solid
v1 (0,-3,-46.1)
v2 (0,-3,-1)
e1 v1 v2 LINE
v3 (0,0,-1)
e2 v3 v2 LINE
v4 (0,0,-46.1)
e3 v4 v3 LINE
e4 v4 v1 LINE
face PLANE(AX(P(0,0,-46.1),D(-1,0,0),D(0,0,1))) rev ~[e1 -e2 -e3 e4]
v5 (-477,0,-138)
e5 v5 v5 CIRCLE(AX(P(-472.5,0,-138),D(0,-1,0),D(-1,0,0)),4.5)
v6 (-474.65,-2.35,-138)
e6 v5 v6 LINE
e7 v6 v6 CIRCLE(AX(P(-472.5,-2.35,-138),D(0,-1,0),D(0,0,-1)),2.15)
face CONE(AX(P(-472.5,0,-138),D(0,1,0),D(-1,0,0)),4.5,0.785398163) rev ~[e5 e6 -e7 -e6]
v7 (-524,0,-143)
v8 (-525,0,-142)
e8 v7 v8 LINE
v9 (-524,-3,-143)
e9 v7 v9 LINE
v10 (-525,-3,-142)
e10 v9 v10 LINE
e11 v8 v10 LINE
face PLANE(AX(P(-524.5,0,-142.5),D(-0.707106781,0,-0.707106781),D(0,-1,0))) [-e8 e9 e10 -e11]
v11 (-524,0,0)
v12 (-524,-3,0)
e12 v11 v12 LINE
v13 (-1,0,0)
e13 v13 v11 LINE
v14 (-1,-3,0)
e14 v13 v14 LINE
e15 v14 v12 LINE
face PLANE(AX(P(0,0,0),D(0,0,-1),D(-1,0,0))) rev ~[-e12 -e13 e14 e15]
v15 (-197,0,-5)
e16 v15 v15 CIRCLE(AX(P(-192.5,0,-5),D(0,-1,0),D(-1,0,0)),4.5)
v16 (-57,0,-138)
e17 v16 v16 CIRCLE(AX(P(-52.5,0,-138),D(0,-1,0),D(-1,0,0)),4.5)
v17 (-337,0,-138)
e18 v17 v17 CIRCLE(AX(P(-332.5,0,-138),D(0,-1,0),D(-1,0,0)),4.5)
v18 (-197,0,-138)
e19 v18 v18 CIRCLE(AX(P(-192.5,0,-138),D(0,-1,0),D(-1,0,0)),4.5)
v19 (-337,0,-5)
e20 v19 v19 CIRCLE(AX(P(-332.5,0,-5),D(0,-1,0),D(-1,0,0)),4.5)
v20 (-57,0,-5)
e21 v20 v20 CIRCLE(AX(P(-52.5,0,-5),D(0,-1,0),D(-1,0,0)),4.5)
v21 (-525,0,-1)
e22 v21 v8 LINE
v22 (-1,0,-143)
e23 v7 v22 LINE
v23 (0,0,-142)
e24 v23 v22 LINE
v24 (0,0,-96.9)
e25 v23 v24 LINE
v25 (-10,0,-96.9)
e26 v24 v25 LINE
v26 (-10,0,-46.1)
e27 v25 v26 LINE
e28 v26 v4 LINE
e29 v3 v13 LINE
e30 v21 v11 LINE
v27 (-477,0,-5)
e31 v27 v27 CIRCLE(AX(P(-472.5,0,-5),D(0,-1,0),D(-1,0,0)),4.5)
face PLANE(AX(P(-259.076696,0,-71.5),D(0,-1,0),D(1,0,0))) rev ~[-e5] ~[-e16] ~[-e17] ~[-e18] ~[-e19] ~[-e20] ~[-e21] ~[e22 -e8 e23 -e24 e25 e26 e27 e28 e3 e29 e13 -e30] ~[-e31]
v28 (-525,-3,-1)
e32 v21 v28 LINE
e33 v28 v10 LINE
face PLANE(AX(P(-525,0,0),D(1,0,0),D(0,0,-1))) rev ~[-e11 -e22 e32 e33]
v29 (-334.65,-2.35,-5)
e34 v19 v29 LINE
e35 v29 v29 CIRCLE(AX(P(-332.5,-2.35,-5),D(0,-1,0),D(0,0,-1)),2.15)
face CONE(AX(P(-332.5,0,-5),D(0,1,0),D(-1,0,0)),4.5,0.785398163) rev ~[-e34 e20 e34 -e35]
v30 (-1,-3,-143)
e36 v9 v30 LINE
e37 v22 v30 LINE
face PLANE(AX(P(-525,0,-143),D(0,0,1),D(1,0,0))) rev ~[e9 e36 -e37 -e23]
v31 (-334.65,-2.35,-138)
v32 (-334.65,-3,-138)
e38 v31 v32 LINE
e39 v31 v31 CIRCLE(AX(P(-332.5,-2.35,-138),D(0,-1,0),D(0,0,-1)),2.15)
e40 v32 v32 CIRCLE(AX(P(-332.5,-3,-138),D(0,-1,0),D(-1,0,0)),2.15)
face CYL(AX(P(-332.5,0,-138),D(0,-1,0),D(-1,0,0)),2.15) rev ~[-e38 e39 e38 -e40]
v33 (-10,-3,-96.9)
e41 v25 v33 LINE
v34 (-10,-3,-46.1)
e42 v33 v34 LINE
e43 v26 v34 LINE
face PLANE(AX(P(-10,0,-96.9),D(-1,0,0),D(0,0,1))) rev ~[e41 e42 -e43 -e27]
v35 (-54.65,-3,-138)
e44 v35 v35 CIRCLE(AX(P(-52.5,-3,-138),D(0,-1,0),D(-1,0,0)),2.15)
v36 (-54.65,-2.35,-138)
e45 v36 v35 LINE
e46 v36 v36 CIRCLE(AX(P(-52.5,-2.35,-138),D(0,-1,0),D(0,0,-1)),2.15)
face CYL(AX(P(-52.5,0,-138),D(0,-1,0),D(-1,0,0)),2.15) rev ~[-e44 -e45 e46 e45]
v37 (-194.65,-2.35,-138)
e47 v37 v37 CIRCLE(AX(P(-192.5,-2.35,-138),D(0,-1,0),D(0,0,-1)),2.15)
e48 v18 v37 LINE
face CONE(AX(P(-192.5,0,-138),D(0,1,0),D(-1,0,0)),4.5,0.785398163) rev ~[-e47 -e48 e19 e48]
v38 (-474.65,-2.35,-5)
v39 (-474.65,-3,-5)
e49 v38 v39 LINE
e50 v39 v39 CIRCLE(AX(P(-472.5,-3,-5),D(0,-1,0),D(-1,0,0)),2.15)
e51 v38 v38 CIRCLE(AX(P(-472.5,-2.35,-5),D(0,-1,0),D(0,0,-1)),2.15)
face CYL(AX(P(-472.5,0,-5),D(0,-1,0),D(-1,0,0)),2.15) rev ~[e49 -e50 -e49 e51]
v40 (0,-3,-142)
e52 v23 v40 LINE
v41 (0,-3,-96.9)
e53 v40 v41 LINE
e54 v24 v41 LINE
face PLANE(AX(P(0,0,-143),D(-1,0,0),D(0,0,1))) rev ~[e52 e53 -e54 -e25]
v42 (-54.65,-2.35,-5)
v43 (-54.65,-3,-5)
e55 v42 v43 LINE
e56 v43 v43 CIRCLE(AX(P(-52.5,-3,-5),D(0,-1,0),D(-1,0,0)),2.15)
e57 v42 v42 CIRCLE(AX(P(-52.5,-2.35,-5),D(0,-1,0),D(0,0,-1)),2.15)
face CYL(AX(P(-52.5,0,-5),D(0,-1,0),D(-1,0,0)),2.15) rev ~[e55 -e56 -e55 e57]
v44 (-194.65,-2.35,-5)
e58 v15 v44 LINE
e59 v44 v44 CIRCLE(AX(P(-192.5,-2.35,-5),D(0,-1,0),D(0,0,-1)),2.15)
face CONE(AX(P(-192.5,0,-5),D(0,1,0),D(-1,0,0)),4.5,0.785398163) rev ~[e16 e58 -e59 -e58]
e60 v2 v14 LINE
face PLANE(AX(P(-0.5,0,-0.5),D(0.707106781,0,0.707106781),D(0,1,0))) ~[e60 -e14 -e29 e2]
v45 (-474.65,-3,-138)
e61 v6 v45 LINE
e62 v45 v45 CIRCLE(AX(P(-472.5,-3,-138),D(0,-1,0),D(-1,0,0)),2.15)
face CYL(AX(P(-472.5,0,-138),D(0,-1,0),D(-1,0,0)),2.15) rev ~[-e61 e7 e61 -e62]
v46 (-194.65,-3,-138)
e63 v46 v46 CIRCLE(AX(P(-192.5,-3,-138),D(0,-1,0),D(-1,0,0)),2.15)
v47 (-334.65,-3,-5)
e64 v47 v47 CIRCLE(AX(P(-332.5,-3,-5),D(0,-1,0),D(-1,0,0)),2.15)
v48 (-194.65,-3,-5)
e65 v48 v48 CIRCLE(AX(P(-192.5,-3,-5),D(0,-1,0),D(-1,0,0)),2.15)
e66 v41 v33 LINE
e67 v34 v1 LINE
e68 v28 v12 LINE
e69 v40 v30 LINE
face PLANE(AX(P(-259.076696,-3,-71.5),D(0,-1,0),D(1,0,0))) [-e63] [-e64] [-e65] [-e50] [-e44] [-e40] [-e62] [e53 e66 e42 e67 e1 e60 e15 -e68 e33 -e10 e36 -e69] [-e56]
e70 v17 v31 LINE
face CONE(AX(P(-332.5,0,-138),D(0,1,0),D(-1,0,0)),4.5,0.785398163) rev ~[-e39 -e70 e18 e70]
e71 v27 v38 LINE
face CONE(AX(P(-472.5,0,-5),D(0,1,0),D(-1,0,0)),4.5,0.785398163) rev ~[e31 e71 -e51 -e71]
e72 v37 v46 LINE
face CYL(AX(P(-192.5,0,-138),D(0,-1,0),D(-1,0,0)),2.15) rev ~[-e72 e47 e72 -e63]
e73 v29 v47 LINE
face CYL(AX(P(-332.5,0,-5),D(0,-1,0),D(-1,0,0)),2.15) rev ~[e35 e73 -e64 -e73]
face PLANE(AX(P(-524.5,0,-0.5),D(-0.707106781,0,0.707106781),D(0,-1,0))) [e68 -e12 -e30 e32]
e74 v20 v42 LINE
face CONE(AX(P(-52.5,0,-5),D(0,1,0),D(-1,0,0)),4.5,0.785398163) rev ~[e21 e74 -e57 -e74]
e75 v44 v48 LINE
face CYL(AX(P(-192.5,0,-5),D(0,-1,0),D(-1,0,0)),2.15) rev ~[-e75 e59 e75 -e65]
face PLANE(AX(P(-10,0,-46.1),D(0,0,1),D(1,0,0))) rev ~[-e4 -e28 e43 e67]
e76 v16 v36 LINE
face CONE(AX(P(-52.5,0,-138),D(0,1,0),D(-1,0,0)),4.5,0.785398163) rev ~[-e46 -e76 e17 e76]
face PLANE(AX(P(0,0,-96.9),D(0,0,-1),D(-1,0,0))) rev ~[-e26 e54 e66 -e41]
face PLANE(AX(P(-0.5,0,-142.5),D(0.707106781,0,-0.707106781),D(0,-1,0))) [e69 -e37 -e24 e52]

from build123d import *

# Parameters (mm, degrees)
F1_DEPTH       = 3
F3_D           = 4.3
F3_CSINK_D     = 9
F3_CSINK_ANGLE = 90
F4_SIZE        = 1


# Not quite as in the source:
# - a feature names something its author has since deleted; it is built from what else it names


with BuildPart() as f1:
    # F0 (on Front) → F1 (new body)
    with BuildSketch(Plane.XZ):
        Polygon((0, -46.1), (0, 0), (-525, 0), (-525, -143), (0, -143), (0, -96.9), (-10, -96.9), (-10, -46.1), align=None)
    extrude(amount=F1_DEPTH)

    # F3 (through all)
    with Locations(Plane(origin=(0, 0, 0), x_dir=(1, 0, 0), z_dir=(0, 1, 0))):
        with Locations((-472.5, 5), (-332.5, 5), (-192.5, 5), (-52.5, 5), (-52.5, 138), (-192.5, 138), (-332.5, 138), (-472.5, 138)):
            CounterSinkHole(F3_D / 2, F3_CSINK_D / 2, counter_sink_angle=F3_CSINK_ANGLE)

    # F4
    f4_edges = [f1.edges().sort_by_distance(p)[0] for p in [
        (-525, -1.5, 0),
        (-525, -1.5, -143),
        (0, -1.5, -143),
        (0, -1.5, 0),
    ]]
    chamfer(f4_edges, length=F4_SIZE)


solid = f1.part
